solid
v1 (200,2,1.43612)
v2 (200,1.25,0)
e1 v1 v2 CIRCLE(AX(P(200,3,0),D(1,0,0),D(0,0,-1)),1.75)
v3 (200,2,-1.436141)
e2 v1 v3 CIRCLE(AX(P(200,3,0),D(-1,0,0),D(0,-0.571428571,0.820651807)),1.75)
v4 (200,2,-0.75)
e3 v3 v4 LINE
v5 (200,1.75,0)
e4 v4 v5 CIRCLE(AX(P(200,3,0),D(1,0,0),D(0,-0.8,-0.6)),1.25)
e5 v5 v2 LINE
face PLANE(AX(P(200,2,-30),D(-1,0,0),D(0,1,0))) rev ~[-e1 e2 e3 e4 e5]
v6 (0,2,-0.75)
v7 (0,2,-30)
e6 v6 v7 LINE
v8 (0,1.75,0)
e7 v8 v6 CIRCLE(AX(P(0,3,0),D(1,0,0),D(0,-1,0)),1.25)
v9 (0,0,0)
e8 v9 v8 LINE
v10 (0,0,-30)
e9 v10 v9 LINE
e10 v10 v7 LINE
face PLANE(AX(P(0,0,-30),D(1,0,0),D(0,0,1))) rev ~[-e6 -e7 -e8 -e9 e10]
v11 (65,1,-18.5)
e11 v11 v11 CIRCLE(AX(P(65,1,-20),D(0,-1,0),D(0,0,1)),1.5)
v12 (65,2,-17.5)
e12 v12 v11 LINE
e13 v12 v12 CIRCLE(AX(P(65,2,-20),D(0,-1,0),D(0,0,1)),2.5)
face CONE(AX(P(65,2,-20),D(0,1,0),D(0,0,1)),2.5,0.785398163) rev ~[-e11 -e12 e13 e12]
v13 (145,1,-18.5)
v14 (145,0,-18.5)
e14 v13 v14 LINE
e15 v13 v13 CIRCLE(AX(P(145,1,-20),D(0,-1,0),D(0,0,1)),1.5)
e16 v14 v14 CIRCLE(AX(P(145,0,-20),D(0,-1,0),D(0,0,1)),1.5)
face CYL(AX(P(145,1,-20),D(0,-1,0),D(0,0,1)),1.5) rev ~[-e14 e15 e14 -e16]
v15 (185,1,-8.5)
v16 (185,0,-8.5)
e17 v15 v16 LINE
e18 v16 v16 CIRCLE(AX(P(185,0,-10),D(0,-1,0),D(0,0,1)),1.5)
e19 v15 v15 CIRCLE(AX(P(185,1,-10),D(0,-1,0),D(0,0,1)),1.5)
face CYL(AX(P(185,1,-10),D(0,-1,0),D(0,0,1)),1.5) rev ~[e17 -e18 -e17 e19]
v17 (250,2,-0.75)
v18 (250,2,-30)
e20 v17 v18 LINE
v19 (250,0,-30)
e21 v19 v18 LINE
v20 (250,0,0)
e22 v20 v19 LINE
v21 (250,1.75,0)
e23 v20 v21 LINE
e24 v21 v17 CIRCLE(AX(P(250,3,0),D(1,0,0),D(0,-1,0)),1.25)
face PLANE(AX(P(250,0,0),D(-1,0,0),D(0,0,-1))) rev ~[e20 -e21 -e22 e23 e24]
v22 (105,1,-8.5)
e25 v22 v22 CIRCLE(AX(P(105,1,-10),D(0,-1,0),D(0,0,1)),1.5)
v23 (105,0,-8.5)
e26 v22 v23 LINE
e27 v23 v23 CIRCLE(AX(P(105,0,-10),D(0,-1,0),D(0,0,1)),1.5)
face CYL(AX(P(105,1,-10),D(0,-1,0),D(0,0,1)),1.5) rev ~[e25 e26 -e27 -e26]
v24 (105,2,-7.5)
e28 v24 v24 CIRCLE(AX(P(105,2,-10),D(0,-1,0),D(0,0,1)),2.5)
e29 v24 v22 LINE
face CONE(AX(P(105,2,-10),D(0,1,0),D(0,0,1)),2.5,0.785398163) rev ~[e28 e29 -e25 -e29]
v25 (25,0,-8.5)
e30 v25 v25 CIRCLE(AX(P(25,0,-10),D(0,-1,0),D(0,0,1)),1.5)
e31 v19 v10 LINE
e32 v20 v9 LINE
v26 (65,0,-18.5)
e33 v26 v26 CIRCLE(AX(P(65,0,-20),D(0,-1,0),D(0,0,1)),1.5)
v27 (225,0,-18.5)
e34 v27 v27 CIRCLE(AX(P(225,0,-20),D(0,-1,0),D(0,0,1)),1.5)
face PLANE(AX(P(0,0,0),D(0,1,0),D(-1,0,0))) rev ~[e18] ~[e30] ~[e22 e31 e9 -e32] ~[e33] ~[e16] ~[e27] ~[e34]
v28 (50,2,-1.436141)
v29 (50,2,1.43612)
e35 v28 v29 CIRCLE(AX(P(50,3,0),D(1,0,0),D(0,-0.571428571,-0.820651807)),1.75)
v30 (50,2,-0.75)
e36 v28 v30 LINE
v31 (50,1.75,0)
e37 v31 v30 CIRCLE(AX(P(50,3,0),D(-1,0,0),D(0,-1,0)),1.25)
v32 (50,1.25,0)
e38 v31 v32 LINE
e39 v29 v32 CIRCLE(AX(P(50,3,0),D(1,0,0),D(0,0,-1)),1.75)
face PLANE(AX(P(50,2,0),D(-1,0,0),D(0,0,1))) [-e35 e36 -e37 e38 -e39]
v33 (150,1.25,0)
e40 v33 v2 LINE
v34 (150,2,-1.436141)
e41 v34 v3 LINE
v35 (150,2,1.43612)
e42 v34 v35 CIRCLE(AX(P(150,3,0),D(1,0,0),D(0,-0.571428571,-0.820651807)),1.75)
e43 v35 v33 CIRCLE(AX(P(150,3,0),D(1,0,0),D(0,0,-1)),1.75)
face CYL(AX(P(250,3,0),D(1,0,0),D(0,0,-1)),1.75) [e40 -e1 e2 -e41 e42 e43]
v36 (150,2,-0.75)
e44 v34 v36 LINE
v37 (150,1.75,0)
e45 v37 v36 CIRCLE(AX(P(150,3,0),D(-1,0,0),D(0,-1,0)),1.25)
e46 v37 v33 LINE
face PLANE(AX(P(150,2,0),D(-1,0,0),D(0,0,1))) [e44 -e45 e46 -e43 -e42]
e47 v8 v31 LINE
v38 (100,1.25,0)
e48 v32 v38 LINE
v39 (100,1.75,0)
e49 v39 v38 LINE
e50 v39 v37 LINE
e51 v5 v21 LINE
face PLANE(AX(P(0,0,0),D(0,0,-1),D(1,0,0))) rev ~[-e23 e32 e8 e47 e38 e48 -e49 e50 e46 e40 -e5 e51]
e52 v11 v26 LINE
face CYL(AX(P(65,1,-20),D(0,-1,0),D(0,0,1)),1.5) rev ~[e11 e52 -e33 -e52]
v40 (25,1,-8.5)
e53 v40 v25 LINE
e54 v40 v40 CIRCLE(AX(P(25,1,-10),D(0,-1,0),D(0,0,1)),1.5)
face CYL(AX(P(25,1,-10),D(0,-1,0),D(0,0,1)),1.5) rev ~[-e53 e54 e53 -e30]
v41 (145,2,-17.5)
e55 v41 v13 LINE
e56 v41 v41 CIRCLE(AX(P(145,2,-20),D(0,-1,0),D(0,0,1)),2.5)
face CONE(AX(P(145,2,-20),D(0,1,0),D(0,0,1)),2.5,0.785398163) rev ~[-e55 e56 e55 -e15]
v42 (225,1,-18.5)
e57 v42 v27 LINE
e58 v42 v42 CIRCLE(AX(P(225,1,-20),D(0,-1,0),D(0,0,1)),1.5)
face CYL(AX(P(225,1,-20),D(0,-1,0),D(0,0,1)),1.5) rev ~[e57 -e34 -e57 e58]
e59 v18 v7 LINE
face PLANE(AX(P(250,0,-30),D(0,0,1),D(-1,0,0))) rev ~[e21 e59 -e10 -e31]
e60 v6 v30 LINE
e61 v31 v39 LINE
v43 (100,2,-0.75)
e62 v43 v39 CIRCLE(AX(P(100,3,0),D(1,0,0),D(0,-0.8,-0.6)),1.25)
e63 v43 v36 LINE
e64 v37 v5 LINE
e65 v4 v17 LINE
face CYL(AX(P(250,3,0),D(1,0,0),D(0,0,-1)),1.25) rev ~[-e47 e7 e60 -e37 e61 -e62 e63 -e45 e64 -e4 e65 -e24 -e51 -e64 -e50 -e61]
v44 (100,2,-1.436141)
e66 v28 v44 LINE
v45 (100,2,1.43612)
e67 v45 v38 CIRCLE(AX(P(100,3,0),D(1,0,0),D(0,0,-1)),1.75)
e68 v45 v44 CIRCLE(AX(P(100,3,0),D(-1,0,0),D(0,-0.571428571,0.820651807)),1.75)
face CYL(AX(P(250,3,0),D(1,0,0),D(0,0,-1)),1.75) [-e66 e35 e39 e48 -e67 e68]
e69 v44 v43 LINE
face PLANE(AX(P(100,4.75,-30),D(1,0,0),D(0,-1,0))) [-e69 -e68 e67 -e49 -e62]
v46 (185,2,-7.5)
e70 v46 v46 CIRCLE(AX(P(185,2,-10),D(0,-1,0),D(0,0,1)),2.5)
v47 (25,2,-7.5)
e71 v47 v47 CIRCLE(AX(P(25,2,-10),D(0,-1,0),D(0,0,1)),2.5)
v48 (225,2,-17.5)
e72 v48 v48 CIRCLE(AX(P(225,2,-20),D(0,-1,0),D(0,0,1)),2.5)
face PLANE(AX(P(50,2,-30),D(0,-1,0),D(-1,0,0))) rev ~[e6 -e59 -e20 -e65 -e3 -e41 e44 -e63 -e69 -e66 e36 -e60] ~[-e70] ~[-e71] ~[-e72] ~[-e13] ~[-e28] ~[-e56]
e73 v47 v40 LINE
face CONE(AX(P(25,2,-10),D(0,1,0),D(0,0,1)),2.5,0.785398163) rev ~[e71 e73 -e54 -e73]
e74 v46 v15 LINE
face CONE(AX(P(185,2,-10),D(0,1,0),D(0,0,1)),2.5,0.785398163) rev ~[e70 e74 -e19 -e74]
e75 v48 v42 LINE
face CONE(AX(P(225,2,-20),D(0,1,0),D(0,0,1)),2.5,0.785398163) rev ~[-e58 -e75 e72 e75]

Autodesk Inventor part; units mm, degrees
ref_plane "YZ Plane" through (0, 0, 0) normal (1, 0, 0) x (0, 1, 0)
ref_plane "XZ Plane" through (0, 0, 0) normal (0, 1, 0) x (-1, 0, 0)
ref_plane "XY Plane" through (0, 0, 0) normal (0, 0, 1) x (1, 0, 0)
sketch "Sketch1" plane through (0, 0, 0) normal (0, 1, 0) x (-1, 0, 0)
  line L0 (0, 0) -> (-250, 0)
  line L1 (-250, 0) -> (-250, -30)
  line L2 (-250, -30) -> (0, -30)
  line L3 (0, -30) -> (0, 0)
  dimension "d0" = 250
  dimension "d1" = 30
extrude "Extrusion1" add sketch "Sketch1" along normal blind 2
sketch "Sketch2" plane through (250, 0, 0) normal (1, 0, 0) x (0, 0, -1)
  circle A0 centre (0, 3) radius 1.25
  circle A1 centre (0, 3) radius 1.75
  point P0 (0, 0)
  dimension "d4" = 2.5
  dimension "d5" = 3
  dimension "d6" = 3.5
extrude "Extrusion2" add sketch "Sketch2" against normal blind 250
extrude "Extrusion3" cut sketch "Sketch2" against normal blind 250 contours A0
sketch "Sketch3" plane through (250, 0, -30) normal (0, 0, -1) x (-1, 0, 0)
  line L0 (0, 2) -> (250, 2) projected
  line L1 (0, 2) -> (50, 2)
  line L2 (50, 2) -> (50, 4.75)
  line L3 (50, 4.75) -> (0, 4.75)
  line L4 (0, 4.75) -> (0, 2)
  line L5 (100, 4.75) -> (150, 4.75)
  line L6 (150, 4.75) -> (150, 2)
  line L7 (150, 2) -> (100, 2)
  line L8 (100, 2) -> (100, 4.75)
  line L9 (200, 4.75) -> (250, 4.75)
  line L10 (250, 4.75) -> (250, 2)
  line L11 (250, 2) -> (200, 2)
  line L12 (200, 2) -> (200, 4.75)
  point P0 (250, 0)
  point P1 (125, 2)
  point P2 (125, 2)
  point P3 (225, 2)
  dimension "d11" = 50
  dimension "d12" = 2.75
  dimension "d13" = 50
  dimension "d14" = 2.75
  dimension "d15" = 50
  dimension "d16" = 50
  dimension "d17" = 2.75
  dimension "d18" = 50
extrude "Extrusion4" cut sketch "Sketch3" against normal through all
sketch "Sketch4" plane through (200, 2, 1.4361) normal (0, 1, 0) x (1, 0, 0)
  line L0 (-200, 1.4361) -> (-200, 0) projected
  line L1 (-150, 0) -> (-200, 0) projected
  line L2 (-200, 1.4361) -> (-150, 1.4361)
  line L3 (-150, 1.4361) -> (-150, 0)
  line L4 (-150, 0) -> (-200, 0)
  line L5 (-200, 0) -> (-200, 1.4361)
  line L6 (-100, 0.1861) -> (-100, 2.6861) projected
  line L7 (-50, 0.6861) -> (-50, 0) projected
  line L8 (-100, 1.4361) -> (-50, 1.4361)
  line L9 (-50, 1.4361) -> (-50, 0)
  line L10 (-50, 0) -> (-100, 0)
  line L11 (-100, 0) -> (-100, 1.4361)
  line L12 (50, 2.1861) -> (50, 0.6861) projected
  line L13 (50, 0) -> (0, 0) projected
  line L14 (50, 1.4361) -> (0, 1.4361)
  line L15 (0, 1.4361) -> (0, 0)
  line L16 (0, 0) -> (50, 0)
  line L17 (50, 0) -> (50, 1.4361)
  point P0 (-100, 2.1861)
  point P1 (-100, 0.6861)
extrude "Extrusion5" cut sketch "Sketch4" against normal through all
sketch "Sketch5" plane through (0, 2, 0) normal (0, 1, 0) x (1, 0, 0)
  line L0 (100, 1.75) -> (100, -1.75) projected
  line L1 (0, 0) -> (50, 0) projected
  point P0 (25, 10)
  point P1 (65, 20)
  point P2 (105, 10)
  point P3 (145, 20)
  point P4 (185, 10)
  point P5 (225, 20)
  point P6 (100, 0)
  point P7 (100, 1.4361)
  dimension "d23" = 40
  dimension "d24" = 5
  dimension "d25" = 40
  dimension "d26" = 40
  dimension "d27" = 40
  dimension "d28" = 40
  dimension "d29" = 10
  dimension "d30" = 10
hole "Hole1" at (25, 2, -10) at (65, 2, -20) at (105, 2, -10) at (145, 2, -20) at (185, 2, -10) at (225, 2, -20) direction (0, -1, 0) diameter 3 end through all countersink diameter 5 countersink angle 90
equation "\"d13\" = d11"
equation "\"d15\" = d11"
equation "\"d16\" = d11"
equation "\"d18\" = d11"
equation "\"d25\" = d23"
equation "\"d26\" = d23"
equation "\"d27\" = d23"
equation "\"d28\" = d23"
properties part number "Hinge 1 of 2" material "Steel"
